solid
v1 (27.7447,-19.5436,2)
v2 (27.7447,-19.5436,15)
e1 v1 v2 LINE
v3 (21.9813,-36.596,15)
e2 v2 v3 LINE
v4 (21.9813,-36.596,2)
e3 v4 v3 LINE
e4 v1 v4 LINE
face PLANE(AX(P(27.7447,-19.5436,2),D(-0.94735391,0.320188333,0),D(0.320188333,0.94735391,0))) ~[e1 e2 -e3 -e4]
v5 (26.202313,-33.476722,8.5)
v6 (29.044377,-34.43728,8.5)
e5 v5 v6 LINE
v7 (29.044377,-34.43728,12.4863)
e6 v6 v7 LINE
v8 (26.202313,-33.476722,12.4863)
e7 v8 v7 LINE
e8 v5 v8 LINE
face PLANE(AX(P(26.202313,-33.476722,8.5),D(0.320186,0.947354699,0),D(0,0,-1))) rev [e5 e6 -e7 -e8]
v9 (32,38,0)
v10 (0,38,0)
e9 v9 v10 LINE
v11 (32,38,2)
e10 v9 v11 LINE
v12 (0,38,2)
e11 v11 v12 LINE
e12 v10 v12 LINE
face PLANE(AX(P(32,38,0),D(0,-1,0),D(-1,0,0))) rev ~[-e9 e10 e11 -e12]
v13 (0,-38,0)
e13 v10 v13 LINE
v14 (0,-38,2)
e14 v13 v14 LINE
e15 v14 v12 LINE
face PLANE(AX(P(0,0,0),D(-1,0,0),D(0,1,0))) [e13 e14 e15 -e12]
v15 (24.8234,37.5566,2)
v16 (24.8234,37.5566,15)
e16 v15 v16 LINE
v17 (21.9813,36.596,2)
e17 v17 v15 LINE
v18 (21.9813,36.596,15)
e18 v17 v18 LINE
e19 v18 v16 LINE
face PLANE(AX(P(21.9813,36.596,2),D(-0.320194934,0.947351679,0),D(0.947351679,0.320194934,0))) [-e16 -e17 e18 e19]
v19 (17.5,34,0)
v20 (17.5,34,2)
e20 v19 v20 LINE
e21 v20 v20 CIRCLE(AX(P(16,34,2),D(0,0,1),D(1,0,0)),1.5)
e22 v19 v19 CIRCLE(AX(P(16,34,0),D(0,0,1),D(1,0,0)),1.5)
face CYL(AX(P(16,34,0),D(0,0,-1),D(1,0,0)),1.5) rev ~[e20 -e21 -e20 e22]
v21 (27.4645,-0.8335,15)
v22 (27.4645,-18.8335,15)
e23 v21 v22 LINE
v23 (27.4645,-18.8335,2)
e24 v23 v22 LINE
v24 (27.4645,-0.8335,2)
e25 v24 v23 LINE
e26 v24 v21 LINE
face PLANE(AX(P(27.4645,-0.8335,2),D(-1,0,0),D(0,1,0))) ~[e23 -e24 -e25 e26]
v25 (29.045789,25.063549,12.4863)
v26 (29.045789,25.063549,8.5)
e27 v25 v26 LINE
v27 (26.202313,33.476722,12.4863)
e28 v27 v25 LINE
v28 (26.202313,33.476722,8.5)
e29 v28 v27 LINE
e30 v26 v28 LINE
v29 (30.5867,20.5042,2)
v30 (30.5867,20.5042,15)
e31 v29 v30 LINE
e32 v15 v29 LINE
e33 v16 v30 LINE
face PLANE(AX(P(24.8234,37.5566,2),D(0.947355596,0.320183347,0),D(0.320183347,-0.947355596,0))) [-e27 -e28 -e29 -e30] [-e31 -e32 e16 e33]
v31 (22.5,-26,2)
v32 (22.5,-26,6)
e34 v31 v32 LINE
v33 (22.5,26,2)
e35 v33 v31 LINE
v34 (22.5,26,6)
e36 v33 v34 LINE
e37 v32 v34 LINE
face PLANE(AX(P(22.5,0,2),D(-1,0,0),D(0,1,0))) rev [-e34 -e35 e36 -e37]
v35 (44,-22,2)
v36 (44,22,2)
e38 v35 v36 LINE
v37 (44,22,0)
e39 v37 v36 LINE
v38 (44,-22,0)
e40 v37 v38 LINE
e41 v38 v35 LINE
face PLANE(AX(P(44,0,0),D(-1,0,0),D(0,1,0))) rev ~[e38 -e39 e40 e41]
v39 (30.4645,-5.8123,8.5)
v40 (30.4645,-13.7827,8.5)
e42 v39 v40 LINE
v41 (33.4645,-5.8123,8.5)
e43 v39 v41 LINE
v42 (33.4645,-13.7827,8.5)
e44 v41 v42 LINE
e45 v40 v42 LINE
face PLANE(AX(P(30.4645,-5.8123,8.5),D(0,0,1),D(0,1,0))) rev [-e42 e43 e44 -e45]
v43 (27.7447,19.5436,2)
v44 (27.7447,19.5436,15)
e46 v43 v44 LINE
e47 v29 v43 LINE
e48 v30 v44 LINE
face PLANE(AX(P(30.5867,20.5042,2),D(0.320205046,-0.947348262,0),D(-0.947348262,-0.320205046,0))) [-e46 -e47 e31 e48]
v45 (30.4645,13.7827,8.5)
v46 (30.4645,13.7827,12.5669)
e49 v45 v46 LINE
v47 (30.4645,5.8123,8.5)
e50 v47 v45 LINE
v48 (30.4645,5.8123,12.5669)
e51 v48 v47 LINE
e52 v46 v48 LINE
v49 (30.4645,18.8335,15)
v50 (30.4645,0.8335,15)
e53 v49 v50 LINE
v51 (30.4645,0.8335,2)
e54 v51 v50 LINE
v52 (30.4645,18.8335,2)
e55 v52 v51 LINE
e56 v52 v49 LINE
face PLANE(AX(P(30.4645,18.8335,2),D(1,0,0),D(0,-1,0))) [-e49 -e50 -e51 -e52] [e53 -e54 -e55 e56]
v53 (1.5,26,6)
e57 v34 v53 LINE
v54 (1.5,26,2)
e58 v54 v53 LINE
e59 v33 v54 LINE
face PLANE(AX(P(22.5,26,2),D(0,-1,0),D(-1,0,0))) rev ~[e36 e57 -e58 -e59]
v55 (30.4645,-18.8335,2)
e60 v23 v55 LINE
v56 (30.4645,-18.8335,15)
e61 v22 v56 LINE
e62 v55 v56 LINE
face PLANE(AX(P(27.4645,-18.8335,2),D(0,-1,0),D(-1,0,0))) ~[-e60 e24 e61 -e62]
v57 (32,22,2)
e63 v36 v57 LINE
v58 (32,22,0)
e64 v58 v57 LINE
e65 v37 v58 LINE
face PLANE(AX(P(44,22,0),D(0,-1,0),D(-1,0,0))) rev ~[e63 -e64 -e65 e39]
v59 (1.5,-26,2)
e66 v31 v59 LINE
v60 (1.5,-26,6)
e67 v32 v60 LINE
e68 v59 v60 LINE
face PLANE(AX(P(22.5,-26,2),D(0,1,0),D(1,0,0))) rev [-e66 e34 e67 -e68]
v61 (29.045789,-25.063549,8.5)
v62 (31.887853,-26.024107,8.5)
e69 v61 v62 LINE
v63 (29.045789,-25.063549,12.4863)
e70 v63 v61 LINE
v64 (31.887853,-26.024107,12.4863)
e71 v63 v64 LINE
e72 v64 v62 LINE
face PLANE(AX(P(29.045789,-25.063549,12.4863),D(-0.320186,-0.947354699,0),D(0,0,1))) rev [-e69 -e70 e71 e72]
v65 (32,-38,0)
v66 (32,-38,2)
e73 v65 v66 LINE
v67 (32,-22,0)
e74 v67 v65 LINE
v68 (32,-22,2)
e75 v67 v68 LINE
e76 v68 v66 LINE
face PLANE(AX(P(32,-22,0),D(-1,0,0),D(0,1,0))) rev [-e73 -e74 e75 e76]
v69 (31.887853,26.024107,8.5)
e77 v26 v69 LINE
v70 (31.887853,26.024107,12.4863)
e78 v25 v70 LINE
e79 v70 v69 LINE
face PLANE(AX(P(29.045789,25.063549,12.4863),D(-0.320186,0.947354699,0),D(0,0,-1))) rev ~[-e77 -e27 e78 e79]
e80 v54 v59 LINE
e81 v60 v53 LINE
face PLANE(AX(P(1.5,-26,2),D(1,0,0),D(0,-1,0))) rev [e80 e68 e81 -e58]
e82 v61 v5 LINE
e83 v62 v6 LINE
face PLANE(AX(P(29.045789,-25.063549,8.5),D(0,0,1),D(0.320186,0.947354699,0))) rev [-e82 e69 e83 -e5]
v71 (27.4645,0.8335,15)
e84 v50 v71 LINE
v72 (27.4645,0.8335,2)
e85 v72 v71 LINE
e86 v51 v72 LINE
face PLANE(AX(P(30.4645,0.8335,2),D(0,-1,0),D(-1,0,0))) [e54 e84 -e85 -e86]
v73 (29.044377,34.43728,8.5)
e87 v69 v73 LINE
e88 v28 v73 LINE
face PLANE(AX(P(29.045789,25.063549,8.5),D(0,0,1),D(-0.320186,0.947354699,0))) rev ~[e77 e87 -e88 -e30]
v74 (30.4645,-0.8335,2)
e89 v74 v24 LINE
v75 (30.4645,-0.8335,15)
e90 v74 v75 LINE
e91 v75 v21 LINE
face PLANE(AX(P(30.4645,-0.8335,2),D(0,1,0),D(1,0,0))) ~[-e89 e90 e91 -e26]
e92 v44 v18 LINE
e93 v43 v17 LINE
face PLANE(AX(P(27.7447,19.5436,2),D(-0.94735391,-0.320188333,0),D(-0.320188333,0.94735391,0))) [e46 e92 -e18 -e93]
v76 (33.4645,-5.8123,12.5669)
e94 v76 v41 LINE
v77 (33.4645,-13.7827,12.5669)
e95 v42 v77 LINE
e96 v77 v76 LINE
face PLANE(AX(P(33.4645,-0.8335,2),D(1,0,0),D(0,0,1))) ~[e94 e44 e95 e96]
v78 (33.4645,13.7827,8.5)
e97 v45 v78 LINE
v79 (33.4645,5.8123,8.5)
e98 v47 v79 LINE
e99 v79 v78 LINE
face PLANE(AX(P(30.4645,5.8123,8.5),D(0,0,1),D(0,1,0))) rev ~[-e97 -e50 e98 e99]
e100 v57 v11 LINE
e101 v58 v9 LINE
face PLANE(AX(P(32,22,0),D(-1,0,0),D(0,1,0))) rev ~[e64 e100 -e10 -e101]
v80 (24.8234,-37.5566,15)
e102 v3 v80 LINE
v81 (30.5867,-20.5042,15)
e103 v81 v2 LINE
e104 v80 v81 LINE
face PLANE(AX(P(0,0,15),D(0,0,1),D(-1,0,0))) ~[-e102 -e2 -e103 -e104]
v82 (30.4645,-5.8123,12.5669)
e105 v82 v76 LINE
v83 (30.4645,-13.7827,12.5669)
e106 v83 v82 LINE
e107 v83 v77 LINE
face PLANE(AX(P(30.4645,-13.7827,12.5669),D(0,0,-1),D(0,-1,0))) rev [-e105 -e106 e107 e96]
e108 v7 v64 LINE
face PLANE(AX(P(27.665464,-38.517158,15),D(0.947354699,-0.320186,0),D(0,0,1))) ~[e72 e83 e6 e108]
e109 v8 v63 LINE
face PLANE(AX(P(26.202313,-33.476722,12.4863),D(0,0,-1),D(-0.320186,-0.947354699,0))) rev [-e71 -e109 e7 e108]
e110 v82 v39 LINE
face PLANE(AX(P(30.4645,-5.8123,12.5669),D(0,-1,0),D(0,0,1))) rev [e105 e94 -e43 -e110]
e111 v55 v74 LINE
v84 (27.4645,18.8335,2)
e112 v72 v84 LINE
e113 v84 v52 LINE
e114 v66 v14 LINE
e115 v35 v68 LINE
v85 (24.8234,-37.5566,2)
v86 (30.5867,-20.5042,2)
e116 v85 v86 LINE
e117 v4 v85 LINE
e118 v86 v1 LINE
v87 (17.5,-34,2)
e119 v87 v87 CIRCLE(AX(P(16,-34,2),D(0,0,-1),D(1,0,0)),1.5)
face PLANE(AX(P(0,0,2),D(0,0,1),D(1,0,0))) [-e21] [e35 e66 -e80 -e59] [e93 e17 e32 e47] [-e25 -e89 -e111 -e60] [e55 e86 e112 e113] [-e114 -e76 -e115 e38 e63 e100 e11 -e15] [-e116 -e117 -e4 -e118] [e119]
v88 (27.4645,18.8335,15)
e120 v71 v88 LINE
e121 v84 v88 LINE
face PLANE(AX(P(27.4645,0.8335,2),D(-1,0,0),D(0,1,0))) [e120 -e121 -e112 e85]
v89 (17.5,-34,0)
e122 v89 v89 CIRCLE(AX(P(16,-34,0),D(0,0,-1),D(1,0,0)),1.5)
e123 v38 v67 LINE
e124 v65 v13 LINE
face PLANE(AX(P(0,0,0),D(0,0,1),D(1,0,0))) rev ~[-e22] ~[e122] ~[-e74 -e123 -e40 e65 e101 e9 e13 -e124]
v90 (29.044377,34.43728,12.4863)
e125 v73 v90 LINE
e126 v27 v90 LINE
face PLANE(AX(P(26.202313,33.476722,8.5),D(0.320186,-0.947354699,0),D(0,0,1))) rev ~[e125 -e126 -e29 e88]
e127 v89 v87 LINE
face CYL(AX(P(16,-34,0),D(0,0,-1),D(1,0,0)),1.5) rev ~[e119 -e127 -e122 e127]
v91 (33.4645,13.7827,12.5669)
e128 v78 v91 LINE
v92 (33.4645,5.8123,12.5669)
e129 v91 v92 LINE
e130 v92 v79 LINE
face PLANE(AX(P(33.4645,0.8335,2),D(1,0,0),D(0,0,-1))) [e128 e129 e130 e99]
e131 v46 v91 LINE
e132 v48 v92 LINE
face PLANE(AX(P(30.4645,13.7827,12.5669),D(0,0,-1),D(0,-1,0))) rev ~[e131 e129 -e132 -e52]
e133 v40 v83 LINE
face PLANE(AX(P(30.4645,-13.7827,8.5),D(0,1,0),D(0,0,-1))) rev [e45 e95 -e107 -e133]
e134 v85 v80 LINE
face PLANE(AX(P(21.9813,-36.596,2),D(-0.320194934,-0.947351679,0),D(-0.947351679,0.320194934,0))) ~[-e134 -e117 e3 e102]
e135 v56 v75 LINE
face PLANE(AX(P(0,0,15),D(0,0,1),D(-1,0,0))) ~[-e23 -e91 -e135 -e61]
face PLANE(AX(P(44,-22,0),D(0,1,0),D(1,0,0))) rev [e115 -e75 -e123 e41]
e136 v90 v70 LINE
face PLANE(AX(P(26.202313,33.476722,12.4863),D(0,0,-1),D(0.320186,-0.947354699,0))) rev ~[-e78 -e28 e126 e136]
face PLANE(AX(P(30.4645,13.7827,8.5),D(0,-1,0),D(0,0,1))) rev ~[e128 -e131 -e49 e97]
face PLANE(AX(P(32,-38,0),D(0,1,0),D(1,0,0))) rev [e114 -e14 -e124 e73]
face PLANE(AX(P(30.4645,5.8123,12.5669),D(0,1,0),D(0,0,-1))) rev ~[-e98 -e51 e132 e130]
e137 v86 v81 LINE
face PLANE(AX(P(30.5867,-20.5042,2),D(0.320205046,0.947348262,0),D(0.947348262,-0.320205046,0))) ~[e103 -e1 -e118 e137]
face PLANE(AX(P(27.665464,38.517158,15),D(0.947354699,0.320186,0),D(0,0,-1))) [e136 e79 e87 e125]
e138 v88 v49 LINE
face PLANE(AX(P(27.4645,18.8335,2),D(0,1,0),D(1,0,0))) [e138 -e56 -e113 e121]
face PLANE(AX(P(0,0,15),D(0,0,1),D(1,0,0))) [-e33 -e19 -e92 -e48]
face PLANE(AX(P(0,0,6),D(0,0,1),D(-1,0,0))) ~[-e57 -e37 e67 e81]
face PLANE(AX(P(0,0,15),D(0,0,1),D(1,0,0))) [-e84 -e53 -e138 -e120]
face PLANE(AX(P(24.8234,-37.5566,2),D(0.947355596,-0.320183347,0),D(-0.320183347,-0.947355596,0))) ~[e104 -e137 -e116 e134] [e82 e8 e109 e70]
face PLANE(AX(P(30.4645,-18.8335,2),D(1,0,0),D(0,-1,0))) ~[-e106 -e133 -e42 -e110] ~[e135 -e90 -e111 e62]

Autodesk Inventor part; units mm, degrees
ref_plane "YZ Plane" through (0, 0, 0) normal (1, 0, 0) x (0, 1, 0)
ref_plane "XZ Plane" through (0, 0, 0) normal (0, 1, 0) x (-1, 0, 0)
ref_plane "XY Plane" through (0, 0, 0) normal (0, 0, 1) x (1, 0, 0)
sketch "Szkic1" plane through (0, 0, 0) normal (0, 0, 1) x (1, 0, 0)
  line L0 (0, -7.6) -> (0, 45.6) projected
  line L1 (-8.8, 0) -> (52.8, 0) projected
  line L2 (0, 0) -> (32, 0)
  line L3 (32, 0) -> (32, 38)
  line L4 (32, 38) -> (0, 38)
  line L5 (0, 38) -> (0, 0)
  circle A0 centre (16, 34) radius 1.5
  line L6 (32, 0) -> (44, 0)
  line L7 (44, 0) -> (44, 22)
  line L8 (44, 22) -> (32, 22)
  line L9 (32, 22) -> (32, 0)
  point P0 (0, 38)
  point P1 (32, 0)
  dimension "d0" = 32
  dimension "d1" = 38
  dimension "d2" = 3
  dimension "d3" = 4
  dimension "d4" = 16
  dimension "d18" = 12
  dimension "d19" = 22
extrude "Wyciągnięcie proste1" add sketch "Szkic1" along normal blind 2
sketch "Szkic2" plane through (0, 0, 2) normal (0, 0, 1) x (1, 0, 0)
  line L0 (0, 38) -> (0, 0) projected
  line L1 (0, 0) -> (44, 0) projected
  line L2 (32, 22) -> (32, 38) projected
  line L3 (32, 38) -> (0, 38) projected
  circle A0 centre (16, 34) radius 1.5 projected
  line L4 (0, 0) -> (44, 0) projected
  line L5 (1.5, 0) -> (22.5, 0)
  line L6 (22.5, 0) -> (22.5, 26)
  line L7 (22.5, 26) -> (1.5, 26)
  line L8 (1.5, 26) -> (1.5, 0)
  line L9 (44, 0) -> (44, 22) projected
  line L10 (44, 22) -> (32, 22) projected
  point P0 (32, 0)
  dimension "d7" = 26
  dimension "d8" = 21
  dimension "d9" = 1.5
extrude "Wyciągnięcie proste2" add sketch "Szkic2" along normal blind 4 contours L8 L7 L6 L1
sketch "Szkic3" plane through (0, 0, 2) normal (0, 0, 1) x (1, 0, 0)
  line L0 (27.4645, 18.8335) -> (30.4645, 18.8335)
  line L1 (30.4645, 18.8335) -> (30.4645, 0.8335)
  line L2 (30.4645, 0.8335) -> (27.4645, 0.8335)
  line L3 (27.4645, 0.8335) -> (27.4645, 18.8335)
  line L4 (32, 22) -> (32, 38) projected
  line L5 (21.9813, 36.596) -> (24.8234, 37.5566)
  line L6 (24.8234, 37.5566) -> (30.5867, 20.5042)
  line L7 (30.5867, 20.5042) -> (27.7447, 19.5436)
  line L8 (27.7447, 19.5436) -> (21.9813, 36.596)
  point P0 (0, 0)
  point P1 (32, 0)
  point P2 (26, 22.676)
  point P3 (26, 4.676)
  dimension "d14" = 18
  dimension "d15" = 3
  dimension "d20" = 18
  dimension "d21" = 3
extrude "Wyciągnięcie proste3" add sketch "Szkic3" along normal blind 13
sketch "Szkic4" plane through (30.4645, 0.8335, 2) normal (1, 0, 0) x (0, 0, -1)
  line L0 (0, 18) -> (0, 0) projected
  line L1 (0, 18) -> (-13, 18) projected
  line L2 (-13, 0) -> (-13, 18) projected
  line L3 (0, 0) -> (-13, 0) projected
  line L4 (-10.5669, 4.9788) -> (-6.5, 4.9788)
  line L5 (-6.5, 4.9788) -> (-6.5, 12.9492)
  line L6 (-6.5, 12.9492) -> (-10.5669, 12.9492)
  line L7 (-10.5669, 12.9492) -> (-10.5669, 4.9788)
  point P0 (2, -0.8335)
extrude "Wyciągnięcie proste4" add sketch "Szkic4" along normal blind 3 contours L7 L6 L5 L4
sketch "Szkic5" plane through (24.8234, 37.5566, 15) normal (0.9473547, 0.320186, 0) x (0, 0, -1)
  line L0 (13, 0) -> (13, -18) projected
  line L1 (13, 0) -> (0, 0) projected
  line L2 (0, -18) -> (0, 0) projected
  line L3 (13, -18) -> (0, -18) projected
  line L4 (2.5137, -13.1873) -> (6.5, -13.1873)
  line L5 (6.5, -13.1873) -> (6.5, -4.3066)
  line L6 (6.5, -4.3066) -> (2.5137, -4.3066)
  line L7 (2.5137, -4.3066) -> (2.5137, -13.1873)
  point P0 (15, -27.6313)
extrude "Wyciągnięcie proste5" add sketch "Szkic5" along normal blind 3 contours L7 L6 L5 L4
mirror "Odbij2" about plane through (0, 0, 0) normal (0, 1, 0) of "Wyciągnięcie proste1", "Wyciągnięcie proste2", "Wyciągnięcie proste3", "Wyciągnięcie proste4", "Wyciągnięcie proste5"
properties part number "płytka_pcb" material "Tworzywo sztuczne ABS"
